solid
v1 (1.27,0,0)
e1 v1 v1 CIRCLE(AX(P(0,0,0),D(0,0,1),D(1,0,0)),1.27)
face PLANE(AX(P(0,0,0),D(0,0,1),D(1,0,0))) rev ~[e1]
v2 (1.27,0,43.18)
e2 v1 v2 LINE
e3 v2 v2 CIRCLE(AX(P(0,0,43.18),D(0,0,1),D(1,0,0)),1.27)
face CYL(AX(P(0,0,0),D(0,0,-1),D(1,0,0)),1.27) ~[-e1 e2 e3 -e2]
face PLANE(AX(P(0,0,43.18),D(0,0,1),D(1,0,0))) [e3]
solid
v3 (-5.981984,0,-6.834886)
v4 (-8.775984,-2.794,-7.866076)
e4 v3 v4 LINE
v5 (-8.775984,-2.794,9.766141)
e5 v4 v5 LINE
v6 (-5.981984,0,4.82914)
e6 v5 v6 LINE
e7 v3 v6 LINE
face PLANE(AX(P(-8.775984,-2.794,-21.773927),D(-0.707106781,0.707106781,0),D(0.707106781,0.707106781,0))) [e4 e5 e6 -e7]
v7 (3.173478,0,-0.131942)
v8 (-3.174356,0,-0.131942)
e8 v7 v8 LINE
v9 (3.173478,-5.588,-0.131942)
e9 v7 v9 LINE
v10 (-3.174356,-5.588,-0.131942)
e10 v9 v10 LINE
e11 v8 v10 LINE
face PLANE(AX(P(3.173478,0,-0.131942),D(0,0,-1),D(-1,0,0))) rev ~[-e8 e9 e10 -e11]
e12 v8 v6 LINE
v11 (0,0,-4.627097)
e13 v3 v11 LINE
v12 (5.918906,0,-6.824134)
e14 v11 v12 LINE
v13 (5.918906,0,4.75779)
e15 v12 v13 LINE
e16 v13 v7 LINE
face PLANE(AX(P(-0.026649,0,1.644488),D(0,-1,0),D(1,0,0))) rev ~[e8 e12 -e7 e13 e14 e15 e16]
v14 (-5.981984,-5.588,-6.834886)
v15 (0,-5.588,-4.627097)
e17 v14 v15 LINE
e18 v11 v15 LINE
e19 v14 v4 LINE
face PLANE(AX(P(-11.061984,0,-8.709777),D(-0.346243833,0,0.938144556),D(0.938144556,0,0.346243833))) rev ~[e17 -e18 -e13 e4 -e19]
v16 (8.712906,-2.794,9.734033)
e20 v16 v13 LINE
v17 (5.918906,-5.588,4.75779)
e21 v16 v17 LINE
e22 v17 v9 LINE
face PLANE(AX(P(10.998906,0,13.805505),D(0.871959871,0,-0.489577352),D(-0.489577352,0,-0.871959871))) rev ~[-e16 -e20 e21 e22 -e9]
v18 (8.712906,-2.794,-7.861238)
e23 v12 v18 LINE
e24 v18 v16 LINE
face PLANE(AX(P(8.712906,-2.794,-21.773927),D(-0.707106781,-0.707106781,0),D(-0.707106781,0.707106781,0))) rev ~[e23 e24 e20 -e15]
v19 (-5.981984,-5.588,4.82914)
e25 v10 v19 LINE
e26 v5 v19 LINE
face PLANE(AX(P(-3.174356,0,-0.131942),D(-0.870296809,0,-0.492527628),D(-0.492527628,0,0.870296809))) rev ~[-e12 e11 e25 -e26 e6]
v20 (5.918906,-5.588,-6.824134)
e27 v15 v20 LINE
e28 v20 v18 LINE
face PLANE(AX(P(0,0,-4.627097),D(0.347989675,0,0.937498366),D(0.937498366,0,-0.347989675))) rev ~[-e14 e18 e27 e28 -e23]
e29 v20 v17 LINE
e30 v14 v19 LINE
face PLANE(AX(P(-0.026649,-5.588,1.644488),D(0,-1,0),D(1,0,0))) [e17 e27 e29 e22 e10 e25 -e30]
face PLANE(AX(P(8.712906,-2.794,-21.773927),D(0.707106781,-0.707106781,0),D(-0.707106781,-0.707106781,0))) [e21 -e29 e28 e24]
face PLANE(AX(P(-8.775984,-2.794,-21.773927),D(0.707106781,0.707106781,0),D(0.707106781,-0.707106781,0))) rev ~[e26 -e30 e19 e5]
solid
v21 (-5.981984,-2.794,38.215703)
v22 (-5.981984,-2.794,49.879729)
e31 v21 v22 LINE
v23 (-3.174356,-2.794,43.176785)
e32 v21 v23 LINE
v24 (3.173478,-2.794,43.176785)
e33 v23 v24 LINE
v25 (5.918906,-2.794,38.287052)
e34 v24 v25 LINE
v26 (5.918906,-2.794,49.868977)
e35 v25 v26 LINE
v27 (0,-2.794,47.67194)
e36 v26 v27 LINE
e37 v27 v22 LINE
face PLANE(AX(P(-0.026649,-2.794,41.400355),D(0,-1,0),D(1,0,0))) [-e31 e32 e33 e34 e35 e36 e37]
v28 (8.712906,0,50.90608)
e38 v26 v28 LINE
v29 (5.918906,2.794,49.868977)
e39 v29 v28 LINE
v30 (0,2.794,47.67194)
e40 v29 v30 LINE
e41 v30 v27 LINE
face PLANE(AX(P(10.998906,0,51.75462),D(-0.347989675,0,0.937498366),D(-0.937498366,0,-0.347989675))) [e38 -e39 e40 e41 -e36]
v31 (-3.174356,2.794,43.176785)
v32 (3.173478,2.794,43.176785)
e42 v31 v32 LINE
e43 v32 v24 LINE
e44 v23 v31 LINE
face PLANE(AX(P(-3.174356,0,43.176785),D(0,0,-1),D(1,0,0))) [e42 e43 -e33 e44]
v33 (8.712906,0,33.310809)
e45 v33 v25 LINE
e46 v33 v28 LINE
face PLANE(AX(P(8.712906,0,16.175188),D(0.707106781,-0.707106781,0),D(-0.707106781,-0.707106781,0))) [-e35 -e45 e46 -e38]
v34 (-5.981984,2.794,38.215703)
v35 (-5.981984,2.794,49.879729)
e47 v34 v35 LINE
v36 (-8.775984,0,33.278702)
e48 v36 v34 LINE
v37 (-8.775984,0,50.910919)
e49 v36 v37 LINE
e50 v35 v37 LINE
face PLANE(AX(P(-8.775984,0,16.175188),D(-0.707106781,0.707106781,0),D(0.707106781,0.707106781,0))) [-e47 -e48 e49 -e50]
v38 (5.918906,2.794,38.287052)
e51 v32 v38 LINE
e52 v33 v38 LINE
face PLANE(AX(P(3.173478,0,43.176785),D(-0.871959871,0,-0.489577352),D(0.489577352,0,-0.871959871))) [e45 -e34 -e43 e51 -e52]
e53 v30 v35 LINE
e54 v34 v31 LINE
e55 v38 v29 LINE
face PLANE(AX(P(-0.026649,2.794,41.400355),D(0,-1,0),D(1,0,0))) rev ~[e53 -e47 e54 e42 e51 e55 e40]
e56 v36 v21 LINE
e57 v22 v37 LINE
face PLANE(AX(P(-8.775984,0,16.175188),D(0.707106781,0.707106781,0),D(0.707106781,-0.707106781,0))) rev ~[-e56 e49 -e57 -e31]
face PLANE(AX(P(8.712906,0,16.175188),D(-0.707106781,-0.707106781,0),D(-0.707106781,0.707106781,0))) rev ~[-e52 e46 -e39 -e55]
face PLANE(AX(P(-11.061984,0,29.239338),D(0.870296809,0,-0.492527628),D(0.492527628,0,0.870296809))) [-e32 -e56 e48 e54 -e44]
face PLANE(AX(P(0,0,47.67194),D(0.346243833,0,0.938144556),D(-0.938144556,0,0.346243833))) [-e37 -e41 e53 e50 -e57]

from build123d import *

# Parameters (mm, degrees)
F0_R        = 1.27
F1_DEPTH    = 43.18
F3_DEPTH    = 2.794
F4_T1_DEPTH = 48.6435811926
F5_DEPTH    = 5.588
F6_T1_DEPTH = 48.6435811926


# Not quite as in the source:
# - a fillet or chamfer that OpenCascade refuses, or shapes differently, is made with other operations: its cross-section is extruded or revolved along the edge and cut away or added


with BuildPart() as f1:
    # F0 (on Top) → F1 (new body)
    with BuildSketch(Plane.XY):
        Circle(F0_R)
    extrude(amount=F1_DEPTH)


with BuildPart() as f3:
    # F2 (on Front) → F3 (new body, symmetric)
    with BuildSketch(Plane.XZ):
        Polygon((-3.1743557192, 43.1767851114), (3.1734784134, 43.1767851114), (10.9989056364, 29.2393378913), (10.9989056364, 51.7546199262), (0, 47.6719401777), (-11.0619841143, 51.7546199262), (-11.0619841143, 29.2393378913), align=None)
    extrude(amount=F3_DEPTH, both=True)

    # F4: chamfer of 5.08 on 4 edges, made by hand

    # F4_s2 → F4_t1 (cut)
    with BuildSketch(Plane.XY.offset(16.1751883125)):
        Polygon((10.9989056364, 2.286), (5.9189056364, -2.794), (10.9989056364, -2.794), align=None)
        Polygon((10.9989056364, -2.286), (5.9189056364, 2.794), (10.9989056364, 2.794), align=None)
        Polygon((-11.0619841143, 2.286), (-5.9819841143, -2.794), (-11.0619841143, -2.794), align=None)
        Polygon((-11.0619841143, -2.286), (-5.9819841143, 2.794), (-11.0619841143, 2.794), align=None)
    extrude(amount=F4_T1_DEPTH, mode=Mode.SUBTRACT)


with BuildPart() as f5:
    # F2 (on Front) → F5 (new body)
    with BuildSketch(Plane.XZ):
        Polygon((10.9989056364, 13.8055048883), (3.1734784134, -0.1319423318), (-3.1743557192, -0.1319423318), (-11.0619841143, 13.8055048883), (-11.0619841143, -8.7097771466), (0, -4.627097398), (10.9989056364, -8.7097771466), align=None)
    extrude(amount=F5_DEPTH)

    # F6: chamfer of 5.08 on 4 edges, made by hand

    # F6_s2 → F6_t1 (cut)
    with BuildSketch(Plane.XY.offset(-21.7739267254)):
        Polygon((-11.0619841143, -5.08), (-5.9819841143, 0), (-11.0619841143, 0), align=None)
        Polygon((-11.0619841143, -0.508), (-5.9819841143, -5.588), (-11.0619841143, -5.588), align=None)
        Polygon((10.9989056364, -0.508), (5.9189056364, -5.588), (10.9989056364, -5.588), align=None)
        Polygon((10.9989056364, -5.08), (5.9189056364, 0), (10.9989056364, 0), align=None)
    extrude(amount=F6_T1_DEPTH, mode=Mode.SUBTRACT)


solid = Compound([f1.part, f3.part, f5.part])
